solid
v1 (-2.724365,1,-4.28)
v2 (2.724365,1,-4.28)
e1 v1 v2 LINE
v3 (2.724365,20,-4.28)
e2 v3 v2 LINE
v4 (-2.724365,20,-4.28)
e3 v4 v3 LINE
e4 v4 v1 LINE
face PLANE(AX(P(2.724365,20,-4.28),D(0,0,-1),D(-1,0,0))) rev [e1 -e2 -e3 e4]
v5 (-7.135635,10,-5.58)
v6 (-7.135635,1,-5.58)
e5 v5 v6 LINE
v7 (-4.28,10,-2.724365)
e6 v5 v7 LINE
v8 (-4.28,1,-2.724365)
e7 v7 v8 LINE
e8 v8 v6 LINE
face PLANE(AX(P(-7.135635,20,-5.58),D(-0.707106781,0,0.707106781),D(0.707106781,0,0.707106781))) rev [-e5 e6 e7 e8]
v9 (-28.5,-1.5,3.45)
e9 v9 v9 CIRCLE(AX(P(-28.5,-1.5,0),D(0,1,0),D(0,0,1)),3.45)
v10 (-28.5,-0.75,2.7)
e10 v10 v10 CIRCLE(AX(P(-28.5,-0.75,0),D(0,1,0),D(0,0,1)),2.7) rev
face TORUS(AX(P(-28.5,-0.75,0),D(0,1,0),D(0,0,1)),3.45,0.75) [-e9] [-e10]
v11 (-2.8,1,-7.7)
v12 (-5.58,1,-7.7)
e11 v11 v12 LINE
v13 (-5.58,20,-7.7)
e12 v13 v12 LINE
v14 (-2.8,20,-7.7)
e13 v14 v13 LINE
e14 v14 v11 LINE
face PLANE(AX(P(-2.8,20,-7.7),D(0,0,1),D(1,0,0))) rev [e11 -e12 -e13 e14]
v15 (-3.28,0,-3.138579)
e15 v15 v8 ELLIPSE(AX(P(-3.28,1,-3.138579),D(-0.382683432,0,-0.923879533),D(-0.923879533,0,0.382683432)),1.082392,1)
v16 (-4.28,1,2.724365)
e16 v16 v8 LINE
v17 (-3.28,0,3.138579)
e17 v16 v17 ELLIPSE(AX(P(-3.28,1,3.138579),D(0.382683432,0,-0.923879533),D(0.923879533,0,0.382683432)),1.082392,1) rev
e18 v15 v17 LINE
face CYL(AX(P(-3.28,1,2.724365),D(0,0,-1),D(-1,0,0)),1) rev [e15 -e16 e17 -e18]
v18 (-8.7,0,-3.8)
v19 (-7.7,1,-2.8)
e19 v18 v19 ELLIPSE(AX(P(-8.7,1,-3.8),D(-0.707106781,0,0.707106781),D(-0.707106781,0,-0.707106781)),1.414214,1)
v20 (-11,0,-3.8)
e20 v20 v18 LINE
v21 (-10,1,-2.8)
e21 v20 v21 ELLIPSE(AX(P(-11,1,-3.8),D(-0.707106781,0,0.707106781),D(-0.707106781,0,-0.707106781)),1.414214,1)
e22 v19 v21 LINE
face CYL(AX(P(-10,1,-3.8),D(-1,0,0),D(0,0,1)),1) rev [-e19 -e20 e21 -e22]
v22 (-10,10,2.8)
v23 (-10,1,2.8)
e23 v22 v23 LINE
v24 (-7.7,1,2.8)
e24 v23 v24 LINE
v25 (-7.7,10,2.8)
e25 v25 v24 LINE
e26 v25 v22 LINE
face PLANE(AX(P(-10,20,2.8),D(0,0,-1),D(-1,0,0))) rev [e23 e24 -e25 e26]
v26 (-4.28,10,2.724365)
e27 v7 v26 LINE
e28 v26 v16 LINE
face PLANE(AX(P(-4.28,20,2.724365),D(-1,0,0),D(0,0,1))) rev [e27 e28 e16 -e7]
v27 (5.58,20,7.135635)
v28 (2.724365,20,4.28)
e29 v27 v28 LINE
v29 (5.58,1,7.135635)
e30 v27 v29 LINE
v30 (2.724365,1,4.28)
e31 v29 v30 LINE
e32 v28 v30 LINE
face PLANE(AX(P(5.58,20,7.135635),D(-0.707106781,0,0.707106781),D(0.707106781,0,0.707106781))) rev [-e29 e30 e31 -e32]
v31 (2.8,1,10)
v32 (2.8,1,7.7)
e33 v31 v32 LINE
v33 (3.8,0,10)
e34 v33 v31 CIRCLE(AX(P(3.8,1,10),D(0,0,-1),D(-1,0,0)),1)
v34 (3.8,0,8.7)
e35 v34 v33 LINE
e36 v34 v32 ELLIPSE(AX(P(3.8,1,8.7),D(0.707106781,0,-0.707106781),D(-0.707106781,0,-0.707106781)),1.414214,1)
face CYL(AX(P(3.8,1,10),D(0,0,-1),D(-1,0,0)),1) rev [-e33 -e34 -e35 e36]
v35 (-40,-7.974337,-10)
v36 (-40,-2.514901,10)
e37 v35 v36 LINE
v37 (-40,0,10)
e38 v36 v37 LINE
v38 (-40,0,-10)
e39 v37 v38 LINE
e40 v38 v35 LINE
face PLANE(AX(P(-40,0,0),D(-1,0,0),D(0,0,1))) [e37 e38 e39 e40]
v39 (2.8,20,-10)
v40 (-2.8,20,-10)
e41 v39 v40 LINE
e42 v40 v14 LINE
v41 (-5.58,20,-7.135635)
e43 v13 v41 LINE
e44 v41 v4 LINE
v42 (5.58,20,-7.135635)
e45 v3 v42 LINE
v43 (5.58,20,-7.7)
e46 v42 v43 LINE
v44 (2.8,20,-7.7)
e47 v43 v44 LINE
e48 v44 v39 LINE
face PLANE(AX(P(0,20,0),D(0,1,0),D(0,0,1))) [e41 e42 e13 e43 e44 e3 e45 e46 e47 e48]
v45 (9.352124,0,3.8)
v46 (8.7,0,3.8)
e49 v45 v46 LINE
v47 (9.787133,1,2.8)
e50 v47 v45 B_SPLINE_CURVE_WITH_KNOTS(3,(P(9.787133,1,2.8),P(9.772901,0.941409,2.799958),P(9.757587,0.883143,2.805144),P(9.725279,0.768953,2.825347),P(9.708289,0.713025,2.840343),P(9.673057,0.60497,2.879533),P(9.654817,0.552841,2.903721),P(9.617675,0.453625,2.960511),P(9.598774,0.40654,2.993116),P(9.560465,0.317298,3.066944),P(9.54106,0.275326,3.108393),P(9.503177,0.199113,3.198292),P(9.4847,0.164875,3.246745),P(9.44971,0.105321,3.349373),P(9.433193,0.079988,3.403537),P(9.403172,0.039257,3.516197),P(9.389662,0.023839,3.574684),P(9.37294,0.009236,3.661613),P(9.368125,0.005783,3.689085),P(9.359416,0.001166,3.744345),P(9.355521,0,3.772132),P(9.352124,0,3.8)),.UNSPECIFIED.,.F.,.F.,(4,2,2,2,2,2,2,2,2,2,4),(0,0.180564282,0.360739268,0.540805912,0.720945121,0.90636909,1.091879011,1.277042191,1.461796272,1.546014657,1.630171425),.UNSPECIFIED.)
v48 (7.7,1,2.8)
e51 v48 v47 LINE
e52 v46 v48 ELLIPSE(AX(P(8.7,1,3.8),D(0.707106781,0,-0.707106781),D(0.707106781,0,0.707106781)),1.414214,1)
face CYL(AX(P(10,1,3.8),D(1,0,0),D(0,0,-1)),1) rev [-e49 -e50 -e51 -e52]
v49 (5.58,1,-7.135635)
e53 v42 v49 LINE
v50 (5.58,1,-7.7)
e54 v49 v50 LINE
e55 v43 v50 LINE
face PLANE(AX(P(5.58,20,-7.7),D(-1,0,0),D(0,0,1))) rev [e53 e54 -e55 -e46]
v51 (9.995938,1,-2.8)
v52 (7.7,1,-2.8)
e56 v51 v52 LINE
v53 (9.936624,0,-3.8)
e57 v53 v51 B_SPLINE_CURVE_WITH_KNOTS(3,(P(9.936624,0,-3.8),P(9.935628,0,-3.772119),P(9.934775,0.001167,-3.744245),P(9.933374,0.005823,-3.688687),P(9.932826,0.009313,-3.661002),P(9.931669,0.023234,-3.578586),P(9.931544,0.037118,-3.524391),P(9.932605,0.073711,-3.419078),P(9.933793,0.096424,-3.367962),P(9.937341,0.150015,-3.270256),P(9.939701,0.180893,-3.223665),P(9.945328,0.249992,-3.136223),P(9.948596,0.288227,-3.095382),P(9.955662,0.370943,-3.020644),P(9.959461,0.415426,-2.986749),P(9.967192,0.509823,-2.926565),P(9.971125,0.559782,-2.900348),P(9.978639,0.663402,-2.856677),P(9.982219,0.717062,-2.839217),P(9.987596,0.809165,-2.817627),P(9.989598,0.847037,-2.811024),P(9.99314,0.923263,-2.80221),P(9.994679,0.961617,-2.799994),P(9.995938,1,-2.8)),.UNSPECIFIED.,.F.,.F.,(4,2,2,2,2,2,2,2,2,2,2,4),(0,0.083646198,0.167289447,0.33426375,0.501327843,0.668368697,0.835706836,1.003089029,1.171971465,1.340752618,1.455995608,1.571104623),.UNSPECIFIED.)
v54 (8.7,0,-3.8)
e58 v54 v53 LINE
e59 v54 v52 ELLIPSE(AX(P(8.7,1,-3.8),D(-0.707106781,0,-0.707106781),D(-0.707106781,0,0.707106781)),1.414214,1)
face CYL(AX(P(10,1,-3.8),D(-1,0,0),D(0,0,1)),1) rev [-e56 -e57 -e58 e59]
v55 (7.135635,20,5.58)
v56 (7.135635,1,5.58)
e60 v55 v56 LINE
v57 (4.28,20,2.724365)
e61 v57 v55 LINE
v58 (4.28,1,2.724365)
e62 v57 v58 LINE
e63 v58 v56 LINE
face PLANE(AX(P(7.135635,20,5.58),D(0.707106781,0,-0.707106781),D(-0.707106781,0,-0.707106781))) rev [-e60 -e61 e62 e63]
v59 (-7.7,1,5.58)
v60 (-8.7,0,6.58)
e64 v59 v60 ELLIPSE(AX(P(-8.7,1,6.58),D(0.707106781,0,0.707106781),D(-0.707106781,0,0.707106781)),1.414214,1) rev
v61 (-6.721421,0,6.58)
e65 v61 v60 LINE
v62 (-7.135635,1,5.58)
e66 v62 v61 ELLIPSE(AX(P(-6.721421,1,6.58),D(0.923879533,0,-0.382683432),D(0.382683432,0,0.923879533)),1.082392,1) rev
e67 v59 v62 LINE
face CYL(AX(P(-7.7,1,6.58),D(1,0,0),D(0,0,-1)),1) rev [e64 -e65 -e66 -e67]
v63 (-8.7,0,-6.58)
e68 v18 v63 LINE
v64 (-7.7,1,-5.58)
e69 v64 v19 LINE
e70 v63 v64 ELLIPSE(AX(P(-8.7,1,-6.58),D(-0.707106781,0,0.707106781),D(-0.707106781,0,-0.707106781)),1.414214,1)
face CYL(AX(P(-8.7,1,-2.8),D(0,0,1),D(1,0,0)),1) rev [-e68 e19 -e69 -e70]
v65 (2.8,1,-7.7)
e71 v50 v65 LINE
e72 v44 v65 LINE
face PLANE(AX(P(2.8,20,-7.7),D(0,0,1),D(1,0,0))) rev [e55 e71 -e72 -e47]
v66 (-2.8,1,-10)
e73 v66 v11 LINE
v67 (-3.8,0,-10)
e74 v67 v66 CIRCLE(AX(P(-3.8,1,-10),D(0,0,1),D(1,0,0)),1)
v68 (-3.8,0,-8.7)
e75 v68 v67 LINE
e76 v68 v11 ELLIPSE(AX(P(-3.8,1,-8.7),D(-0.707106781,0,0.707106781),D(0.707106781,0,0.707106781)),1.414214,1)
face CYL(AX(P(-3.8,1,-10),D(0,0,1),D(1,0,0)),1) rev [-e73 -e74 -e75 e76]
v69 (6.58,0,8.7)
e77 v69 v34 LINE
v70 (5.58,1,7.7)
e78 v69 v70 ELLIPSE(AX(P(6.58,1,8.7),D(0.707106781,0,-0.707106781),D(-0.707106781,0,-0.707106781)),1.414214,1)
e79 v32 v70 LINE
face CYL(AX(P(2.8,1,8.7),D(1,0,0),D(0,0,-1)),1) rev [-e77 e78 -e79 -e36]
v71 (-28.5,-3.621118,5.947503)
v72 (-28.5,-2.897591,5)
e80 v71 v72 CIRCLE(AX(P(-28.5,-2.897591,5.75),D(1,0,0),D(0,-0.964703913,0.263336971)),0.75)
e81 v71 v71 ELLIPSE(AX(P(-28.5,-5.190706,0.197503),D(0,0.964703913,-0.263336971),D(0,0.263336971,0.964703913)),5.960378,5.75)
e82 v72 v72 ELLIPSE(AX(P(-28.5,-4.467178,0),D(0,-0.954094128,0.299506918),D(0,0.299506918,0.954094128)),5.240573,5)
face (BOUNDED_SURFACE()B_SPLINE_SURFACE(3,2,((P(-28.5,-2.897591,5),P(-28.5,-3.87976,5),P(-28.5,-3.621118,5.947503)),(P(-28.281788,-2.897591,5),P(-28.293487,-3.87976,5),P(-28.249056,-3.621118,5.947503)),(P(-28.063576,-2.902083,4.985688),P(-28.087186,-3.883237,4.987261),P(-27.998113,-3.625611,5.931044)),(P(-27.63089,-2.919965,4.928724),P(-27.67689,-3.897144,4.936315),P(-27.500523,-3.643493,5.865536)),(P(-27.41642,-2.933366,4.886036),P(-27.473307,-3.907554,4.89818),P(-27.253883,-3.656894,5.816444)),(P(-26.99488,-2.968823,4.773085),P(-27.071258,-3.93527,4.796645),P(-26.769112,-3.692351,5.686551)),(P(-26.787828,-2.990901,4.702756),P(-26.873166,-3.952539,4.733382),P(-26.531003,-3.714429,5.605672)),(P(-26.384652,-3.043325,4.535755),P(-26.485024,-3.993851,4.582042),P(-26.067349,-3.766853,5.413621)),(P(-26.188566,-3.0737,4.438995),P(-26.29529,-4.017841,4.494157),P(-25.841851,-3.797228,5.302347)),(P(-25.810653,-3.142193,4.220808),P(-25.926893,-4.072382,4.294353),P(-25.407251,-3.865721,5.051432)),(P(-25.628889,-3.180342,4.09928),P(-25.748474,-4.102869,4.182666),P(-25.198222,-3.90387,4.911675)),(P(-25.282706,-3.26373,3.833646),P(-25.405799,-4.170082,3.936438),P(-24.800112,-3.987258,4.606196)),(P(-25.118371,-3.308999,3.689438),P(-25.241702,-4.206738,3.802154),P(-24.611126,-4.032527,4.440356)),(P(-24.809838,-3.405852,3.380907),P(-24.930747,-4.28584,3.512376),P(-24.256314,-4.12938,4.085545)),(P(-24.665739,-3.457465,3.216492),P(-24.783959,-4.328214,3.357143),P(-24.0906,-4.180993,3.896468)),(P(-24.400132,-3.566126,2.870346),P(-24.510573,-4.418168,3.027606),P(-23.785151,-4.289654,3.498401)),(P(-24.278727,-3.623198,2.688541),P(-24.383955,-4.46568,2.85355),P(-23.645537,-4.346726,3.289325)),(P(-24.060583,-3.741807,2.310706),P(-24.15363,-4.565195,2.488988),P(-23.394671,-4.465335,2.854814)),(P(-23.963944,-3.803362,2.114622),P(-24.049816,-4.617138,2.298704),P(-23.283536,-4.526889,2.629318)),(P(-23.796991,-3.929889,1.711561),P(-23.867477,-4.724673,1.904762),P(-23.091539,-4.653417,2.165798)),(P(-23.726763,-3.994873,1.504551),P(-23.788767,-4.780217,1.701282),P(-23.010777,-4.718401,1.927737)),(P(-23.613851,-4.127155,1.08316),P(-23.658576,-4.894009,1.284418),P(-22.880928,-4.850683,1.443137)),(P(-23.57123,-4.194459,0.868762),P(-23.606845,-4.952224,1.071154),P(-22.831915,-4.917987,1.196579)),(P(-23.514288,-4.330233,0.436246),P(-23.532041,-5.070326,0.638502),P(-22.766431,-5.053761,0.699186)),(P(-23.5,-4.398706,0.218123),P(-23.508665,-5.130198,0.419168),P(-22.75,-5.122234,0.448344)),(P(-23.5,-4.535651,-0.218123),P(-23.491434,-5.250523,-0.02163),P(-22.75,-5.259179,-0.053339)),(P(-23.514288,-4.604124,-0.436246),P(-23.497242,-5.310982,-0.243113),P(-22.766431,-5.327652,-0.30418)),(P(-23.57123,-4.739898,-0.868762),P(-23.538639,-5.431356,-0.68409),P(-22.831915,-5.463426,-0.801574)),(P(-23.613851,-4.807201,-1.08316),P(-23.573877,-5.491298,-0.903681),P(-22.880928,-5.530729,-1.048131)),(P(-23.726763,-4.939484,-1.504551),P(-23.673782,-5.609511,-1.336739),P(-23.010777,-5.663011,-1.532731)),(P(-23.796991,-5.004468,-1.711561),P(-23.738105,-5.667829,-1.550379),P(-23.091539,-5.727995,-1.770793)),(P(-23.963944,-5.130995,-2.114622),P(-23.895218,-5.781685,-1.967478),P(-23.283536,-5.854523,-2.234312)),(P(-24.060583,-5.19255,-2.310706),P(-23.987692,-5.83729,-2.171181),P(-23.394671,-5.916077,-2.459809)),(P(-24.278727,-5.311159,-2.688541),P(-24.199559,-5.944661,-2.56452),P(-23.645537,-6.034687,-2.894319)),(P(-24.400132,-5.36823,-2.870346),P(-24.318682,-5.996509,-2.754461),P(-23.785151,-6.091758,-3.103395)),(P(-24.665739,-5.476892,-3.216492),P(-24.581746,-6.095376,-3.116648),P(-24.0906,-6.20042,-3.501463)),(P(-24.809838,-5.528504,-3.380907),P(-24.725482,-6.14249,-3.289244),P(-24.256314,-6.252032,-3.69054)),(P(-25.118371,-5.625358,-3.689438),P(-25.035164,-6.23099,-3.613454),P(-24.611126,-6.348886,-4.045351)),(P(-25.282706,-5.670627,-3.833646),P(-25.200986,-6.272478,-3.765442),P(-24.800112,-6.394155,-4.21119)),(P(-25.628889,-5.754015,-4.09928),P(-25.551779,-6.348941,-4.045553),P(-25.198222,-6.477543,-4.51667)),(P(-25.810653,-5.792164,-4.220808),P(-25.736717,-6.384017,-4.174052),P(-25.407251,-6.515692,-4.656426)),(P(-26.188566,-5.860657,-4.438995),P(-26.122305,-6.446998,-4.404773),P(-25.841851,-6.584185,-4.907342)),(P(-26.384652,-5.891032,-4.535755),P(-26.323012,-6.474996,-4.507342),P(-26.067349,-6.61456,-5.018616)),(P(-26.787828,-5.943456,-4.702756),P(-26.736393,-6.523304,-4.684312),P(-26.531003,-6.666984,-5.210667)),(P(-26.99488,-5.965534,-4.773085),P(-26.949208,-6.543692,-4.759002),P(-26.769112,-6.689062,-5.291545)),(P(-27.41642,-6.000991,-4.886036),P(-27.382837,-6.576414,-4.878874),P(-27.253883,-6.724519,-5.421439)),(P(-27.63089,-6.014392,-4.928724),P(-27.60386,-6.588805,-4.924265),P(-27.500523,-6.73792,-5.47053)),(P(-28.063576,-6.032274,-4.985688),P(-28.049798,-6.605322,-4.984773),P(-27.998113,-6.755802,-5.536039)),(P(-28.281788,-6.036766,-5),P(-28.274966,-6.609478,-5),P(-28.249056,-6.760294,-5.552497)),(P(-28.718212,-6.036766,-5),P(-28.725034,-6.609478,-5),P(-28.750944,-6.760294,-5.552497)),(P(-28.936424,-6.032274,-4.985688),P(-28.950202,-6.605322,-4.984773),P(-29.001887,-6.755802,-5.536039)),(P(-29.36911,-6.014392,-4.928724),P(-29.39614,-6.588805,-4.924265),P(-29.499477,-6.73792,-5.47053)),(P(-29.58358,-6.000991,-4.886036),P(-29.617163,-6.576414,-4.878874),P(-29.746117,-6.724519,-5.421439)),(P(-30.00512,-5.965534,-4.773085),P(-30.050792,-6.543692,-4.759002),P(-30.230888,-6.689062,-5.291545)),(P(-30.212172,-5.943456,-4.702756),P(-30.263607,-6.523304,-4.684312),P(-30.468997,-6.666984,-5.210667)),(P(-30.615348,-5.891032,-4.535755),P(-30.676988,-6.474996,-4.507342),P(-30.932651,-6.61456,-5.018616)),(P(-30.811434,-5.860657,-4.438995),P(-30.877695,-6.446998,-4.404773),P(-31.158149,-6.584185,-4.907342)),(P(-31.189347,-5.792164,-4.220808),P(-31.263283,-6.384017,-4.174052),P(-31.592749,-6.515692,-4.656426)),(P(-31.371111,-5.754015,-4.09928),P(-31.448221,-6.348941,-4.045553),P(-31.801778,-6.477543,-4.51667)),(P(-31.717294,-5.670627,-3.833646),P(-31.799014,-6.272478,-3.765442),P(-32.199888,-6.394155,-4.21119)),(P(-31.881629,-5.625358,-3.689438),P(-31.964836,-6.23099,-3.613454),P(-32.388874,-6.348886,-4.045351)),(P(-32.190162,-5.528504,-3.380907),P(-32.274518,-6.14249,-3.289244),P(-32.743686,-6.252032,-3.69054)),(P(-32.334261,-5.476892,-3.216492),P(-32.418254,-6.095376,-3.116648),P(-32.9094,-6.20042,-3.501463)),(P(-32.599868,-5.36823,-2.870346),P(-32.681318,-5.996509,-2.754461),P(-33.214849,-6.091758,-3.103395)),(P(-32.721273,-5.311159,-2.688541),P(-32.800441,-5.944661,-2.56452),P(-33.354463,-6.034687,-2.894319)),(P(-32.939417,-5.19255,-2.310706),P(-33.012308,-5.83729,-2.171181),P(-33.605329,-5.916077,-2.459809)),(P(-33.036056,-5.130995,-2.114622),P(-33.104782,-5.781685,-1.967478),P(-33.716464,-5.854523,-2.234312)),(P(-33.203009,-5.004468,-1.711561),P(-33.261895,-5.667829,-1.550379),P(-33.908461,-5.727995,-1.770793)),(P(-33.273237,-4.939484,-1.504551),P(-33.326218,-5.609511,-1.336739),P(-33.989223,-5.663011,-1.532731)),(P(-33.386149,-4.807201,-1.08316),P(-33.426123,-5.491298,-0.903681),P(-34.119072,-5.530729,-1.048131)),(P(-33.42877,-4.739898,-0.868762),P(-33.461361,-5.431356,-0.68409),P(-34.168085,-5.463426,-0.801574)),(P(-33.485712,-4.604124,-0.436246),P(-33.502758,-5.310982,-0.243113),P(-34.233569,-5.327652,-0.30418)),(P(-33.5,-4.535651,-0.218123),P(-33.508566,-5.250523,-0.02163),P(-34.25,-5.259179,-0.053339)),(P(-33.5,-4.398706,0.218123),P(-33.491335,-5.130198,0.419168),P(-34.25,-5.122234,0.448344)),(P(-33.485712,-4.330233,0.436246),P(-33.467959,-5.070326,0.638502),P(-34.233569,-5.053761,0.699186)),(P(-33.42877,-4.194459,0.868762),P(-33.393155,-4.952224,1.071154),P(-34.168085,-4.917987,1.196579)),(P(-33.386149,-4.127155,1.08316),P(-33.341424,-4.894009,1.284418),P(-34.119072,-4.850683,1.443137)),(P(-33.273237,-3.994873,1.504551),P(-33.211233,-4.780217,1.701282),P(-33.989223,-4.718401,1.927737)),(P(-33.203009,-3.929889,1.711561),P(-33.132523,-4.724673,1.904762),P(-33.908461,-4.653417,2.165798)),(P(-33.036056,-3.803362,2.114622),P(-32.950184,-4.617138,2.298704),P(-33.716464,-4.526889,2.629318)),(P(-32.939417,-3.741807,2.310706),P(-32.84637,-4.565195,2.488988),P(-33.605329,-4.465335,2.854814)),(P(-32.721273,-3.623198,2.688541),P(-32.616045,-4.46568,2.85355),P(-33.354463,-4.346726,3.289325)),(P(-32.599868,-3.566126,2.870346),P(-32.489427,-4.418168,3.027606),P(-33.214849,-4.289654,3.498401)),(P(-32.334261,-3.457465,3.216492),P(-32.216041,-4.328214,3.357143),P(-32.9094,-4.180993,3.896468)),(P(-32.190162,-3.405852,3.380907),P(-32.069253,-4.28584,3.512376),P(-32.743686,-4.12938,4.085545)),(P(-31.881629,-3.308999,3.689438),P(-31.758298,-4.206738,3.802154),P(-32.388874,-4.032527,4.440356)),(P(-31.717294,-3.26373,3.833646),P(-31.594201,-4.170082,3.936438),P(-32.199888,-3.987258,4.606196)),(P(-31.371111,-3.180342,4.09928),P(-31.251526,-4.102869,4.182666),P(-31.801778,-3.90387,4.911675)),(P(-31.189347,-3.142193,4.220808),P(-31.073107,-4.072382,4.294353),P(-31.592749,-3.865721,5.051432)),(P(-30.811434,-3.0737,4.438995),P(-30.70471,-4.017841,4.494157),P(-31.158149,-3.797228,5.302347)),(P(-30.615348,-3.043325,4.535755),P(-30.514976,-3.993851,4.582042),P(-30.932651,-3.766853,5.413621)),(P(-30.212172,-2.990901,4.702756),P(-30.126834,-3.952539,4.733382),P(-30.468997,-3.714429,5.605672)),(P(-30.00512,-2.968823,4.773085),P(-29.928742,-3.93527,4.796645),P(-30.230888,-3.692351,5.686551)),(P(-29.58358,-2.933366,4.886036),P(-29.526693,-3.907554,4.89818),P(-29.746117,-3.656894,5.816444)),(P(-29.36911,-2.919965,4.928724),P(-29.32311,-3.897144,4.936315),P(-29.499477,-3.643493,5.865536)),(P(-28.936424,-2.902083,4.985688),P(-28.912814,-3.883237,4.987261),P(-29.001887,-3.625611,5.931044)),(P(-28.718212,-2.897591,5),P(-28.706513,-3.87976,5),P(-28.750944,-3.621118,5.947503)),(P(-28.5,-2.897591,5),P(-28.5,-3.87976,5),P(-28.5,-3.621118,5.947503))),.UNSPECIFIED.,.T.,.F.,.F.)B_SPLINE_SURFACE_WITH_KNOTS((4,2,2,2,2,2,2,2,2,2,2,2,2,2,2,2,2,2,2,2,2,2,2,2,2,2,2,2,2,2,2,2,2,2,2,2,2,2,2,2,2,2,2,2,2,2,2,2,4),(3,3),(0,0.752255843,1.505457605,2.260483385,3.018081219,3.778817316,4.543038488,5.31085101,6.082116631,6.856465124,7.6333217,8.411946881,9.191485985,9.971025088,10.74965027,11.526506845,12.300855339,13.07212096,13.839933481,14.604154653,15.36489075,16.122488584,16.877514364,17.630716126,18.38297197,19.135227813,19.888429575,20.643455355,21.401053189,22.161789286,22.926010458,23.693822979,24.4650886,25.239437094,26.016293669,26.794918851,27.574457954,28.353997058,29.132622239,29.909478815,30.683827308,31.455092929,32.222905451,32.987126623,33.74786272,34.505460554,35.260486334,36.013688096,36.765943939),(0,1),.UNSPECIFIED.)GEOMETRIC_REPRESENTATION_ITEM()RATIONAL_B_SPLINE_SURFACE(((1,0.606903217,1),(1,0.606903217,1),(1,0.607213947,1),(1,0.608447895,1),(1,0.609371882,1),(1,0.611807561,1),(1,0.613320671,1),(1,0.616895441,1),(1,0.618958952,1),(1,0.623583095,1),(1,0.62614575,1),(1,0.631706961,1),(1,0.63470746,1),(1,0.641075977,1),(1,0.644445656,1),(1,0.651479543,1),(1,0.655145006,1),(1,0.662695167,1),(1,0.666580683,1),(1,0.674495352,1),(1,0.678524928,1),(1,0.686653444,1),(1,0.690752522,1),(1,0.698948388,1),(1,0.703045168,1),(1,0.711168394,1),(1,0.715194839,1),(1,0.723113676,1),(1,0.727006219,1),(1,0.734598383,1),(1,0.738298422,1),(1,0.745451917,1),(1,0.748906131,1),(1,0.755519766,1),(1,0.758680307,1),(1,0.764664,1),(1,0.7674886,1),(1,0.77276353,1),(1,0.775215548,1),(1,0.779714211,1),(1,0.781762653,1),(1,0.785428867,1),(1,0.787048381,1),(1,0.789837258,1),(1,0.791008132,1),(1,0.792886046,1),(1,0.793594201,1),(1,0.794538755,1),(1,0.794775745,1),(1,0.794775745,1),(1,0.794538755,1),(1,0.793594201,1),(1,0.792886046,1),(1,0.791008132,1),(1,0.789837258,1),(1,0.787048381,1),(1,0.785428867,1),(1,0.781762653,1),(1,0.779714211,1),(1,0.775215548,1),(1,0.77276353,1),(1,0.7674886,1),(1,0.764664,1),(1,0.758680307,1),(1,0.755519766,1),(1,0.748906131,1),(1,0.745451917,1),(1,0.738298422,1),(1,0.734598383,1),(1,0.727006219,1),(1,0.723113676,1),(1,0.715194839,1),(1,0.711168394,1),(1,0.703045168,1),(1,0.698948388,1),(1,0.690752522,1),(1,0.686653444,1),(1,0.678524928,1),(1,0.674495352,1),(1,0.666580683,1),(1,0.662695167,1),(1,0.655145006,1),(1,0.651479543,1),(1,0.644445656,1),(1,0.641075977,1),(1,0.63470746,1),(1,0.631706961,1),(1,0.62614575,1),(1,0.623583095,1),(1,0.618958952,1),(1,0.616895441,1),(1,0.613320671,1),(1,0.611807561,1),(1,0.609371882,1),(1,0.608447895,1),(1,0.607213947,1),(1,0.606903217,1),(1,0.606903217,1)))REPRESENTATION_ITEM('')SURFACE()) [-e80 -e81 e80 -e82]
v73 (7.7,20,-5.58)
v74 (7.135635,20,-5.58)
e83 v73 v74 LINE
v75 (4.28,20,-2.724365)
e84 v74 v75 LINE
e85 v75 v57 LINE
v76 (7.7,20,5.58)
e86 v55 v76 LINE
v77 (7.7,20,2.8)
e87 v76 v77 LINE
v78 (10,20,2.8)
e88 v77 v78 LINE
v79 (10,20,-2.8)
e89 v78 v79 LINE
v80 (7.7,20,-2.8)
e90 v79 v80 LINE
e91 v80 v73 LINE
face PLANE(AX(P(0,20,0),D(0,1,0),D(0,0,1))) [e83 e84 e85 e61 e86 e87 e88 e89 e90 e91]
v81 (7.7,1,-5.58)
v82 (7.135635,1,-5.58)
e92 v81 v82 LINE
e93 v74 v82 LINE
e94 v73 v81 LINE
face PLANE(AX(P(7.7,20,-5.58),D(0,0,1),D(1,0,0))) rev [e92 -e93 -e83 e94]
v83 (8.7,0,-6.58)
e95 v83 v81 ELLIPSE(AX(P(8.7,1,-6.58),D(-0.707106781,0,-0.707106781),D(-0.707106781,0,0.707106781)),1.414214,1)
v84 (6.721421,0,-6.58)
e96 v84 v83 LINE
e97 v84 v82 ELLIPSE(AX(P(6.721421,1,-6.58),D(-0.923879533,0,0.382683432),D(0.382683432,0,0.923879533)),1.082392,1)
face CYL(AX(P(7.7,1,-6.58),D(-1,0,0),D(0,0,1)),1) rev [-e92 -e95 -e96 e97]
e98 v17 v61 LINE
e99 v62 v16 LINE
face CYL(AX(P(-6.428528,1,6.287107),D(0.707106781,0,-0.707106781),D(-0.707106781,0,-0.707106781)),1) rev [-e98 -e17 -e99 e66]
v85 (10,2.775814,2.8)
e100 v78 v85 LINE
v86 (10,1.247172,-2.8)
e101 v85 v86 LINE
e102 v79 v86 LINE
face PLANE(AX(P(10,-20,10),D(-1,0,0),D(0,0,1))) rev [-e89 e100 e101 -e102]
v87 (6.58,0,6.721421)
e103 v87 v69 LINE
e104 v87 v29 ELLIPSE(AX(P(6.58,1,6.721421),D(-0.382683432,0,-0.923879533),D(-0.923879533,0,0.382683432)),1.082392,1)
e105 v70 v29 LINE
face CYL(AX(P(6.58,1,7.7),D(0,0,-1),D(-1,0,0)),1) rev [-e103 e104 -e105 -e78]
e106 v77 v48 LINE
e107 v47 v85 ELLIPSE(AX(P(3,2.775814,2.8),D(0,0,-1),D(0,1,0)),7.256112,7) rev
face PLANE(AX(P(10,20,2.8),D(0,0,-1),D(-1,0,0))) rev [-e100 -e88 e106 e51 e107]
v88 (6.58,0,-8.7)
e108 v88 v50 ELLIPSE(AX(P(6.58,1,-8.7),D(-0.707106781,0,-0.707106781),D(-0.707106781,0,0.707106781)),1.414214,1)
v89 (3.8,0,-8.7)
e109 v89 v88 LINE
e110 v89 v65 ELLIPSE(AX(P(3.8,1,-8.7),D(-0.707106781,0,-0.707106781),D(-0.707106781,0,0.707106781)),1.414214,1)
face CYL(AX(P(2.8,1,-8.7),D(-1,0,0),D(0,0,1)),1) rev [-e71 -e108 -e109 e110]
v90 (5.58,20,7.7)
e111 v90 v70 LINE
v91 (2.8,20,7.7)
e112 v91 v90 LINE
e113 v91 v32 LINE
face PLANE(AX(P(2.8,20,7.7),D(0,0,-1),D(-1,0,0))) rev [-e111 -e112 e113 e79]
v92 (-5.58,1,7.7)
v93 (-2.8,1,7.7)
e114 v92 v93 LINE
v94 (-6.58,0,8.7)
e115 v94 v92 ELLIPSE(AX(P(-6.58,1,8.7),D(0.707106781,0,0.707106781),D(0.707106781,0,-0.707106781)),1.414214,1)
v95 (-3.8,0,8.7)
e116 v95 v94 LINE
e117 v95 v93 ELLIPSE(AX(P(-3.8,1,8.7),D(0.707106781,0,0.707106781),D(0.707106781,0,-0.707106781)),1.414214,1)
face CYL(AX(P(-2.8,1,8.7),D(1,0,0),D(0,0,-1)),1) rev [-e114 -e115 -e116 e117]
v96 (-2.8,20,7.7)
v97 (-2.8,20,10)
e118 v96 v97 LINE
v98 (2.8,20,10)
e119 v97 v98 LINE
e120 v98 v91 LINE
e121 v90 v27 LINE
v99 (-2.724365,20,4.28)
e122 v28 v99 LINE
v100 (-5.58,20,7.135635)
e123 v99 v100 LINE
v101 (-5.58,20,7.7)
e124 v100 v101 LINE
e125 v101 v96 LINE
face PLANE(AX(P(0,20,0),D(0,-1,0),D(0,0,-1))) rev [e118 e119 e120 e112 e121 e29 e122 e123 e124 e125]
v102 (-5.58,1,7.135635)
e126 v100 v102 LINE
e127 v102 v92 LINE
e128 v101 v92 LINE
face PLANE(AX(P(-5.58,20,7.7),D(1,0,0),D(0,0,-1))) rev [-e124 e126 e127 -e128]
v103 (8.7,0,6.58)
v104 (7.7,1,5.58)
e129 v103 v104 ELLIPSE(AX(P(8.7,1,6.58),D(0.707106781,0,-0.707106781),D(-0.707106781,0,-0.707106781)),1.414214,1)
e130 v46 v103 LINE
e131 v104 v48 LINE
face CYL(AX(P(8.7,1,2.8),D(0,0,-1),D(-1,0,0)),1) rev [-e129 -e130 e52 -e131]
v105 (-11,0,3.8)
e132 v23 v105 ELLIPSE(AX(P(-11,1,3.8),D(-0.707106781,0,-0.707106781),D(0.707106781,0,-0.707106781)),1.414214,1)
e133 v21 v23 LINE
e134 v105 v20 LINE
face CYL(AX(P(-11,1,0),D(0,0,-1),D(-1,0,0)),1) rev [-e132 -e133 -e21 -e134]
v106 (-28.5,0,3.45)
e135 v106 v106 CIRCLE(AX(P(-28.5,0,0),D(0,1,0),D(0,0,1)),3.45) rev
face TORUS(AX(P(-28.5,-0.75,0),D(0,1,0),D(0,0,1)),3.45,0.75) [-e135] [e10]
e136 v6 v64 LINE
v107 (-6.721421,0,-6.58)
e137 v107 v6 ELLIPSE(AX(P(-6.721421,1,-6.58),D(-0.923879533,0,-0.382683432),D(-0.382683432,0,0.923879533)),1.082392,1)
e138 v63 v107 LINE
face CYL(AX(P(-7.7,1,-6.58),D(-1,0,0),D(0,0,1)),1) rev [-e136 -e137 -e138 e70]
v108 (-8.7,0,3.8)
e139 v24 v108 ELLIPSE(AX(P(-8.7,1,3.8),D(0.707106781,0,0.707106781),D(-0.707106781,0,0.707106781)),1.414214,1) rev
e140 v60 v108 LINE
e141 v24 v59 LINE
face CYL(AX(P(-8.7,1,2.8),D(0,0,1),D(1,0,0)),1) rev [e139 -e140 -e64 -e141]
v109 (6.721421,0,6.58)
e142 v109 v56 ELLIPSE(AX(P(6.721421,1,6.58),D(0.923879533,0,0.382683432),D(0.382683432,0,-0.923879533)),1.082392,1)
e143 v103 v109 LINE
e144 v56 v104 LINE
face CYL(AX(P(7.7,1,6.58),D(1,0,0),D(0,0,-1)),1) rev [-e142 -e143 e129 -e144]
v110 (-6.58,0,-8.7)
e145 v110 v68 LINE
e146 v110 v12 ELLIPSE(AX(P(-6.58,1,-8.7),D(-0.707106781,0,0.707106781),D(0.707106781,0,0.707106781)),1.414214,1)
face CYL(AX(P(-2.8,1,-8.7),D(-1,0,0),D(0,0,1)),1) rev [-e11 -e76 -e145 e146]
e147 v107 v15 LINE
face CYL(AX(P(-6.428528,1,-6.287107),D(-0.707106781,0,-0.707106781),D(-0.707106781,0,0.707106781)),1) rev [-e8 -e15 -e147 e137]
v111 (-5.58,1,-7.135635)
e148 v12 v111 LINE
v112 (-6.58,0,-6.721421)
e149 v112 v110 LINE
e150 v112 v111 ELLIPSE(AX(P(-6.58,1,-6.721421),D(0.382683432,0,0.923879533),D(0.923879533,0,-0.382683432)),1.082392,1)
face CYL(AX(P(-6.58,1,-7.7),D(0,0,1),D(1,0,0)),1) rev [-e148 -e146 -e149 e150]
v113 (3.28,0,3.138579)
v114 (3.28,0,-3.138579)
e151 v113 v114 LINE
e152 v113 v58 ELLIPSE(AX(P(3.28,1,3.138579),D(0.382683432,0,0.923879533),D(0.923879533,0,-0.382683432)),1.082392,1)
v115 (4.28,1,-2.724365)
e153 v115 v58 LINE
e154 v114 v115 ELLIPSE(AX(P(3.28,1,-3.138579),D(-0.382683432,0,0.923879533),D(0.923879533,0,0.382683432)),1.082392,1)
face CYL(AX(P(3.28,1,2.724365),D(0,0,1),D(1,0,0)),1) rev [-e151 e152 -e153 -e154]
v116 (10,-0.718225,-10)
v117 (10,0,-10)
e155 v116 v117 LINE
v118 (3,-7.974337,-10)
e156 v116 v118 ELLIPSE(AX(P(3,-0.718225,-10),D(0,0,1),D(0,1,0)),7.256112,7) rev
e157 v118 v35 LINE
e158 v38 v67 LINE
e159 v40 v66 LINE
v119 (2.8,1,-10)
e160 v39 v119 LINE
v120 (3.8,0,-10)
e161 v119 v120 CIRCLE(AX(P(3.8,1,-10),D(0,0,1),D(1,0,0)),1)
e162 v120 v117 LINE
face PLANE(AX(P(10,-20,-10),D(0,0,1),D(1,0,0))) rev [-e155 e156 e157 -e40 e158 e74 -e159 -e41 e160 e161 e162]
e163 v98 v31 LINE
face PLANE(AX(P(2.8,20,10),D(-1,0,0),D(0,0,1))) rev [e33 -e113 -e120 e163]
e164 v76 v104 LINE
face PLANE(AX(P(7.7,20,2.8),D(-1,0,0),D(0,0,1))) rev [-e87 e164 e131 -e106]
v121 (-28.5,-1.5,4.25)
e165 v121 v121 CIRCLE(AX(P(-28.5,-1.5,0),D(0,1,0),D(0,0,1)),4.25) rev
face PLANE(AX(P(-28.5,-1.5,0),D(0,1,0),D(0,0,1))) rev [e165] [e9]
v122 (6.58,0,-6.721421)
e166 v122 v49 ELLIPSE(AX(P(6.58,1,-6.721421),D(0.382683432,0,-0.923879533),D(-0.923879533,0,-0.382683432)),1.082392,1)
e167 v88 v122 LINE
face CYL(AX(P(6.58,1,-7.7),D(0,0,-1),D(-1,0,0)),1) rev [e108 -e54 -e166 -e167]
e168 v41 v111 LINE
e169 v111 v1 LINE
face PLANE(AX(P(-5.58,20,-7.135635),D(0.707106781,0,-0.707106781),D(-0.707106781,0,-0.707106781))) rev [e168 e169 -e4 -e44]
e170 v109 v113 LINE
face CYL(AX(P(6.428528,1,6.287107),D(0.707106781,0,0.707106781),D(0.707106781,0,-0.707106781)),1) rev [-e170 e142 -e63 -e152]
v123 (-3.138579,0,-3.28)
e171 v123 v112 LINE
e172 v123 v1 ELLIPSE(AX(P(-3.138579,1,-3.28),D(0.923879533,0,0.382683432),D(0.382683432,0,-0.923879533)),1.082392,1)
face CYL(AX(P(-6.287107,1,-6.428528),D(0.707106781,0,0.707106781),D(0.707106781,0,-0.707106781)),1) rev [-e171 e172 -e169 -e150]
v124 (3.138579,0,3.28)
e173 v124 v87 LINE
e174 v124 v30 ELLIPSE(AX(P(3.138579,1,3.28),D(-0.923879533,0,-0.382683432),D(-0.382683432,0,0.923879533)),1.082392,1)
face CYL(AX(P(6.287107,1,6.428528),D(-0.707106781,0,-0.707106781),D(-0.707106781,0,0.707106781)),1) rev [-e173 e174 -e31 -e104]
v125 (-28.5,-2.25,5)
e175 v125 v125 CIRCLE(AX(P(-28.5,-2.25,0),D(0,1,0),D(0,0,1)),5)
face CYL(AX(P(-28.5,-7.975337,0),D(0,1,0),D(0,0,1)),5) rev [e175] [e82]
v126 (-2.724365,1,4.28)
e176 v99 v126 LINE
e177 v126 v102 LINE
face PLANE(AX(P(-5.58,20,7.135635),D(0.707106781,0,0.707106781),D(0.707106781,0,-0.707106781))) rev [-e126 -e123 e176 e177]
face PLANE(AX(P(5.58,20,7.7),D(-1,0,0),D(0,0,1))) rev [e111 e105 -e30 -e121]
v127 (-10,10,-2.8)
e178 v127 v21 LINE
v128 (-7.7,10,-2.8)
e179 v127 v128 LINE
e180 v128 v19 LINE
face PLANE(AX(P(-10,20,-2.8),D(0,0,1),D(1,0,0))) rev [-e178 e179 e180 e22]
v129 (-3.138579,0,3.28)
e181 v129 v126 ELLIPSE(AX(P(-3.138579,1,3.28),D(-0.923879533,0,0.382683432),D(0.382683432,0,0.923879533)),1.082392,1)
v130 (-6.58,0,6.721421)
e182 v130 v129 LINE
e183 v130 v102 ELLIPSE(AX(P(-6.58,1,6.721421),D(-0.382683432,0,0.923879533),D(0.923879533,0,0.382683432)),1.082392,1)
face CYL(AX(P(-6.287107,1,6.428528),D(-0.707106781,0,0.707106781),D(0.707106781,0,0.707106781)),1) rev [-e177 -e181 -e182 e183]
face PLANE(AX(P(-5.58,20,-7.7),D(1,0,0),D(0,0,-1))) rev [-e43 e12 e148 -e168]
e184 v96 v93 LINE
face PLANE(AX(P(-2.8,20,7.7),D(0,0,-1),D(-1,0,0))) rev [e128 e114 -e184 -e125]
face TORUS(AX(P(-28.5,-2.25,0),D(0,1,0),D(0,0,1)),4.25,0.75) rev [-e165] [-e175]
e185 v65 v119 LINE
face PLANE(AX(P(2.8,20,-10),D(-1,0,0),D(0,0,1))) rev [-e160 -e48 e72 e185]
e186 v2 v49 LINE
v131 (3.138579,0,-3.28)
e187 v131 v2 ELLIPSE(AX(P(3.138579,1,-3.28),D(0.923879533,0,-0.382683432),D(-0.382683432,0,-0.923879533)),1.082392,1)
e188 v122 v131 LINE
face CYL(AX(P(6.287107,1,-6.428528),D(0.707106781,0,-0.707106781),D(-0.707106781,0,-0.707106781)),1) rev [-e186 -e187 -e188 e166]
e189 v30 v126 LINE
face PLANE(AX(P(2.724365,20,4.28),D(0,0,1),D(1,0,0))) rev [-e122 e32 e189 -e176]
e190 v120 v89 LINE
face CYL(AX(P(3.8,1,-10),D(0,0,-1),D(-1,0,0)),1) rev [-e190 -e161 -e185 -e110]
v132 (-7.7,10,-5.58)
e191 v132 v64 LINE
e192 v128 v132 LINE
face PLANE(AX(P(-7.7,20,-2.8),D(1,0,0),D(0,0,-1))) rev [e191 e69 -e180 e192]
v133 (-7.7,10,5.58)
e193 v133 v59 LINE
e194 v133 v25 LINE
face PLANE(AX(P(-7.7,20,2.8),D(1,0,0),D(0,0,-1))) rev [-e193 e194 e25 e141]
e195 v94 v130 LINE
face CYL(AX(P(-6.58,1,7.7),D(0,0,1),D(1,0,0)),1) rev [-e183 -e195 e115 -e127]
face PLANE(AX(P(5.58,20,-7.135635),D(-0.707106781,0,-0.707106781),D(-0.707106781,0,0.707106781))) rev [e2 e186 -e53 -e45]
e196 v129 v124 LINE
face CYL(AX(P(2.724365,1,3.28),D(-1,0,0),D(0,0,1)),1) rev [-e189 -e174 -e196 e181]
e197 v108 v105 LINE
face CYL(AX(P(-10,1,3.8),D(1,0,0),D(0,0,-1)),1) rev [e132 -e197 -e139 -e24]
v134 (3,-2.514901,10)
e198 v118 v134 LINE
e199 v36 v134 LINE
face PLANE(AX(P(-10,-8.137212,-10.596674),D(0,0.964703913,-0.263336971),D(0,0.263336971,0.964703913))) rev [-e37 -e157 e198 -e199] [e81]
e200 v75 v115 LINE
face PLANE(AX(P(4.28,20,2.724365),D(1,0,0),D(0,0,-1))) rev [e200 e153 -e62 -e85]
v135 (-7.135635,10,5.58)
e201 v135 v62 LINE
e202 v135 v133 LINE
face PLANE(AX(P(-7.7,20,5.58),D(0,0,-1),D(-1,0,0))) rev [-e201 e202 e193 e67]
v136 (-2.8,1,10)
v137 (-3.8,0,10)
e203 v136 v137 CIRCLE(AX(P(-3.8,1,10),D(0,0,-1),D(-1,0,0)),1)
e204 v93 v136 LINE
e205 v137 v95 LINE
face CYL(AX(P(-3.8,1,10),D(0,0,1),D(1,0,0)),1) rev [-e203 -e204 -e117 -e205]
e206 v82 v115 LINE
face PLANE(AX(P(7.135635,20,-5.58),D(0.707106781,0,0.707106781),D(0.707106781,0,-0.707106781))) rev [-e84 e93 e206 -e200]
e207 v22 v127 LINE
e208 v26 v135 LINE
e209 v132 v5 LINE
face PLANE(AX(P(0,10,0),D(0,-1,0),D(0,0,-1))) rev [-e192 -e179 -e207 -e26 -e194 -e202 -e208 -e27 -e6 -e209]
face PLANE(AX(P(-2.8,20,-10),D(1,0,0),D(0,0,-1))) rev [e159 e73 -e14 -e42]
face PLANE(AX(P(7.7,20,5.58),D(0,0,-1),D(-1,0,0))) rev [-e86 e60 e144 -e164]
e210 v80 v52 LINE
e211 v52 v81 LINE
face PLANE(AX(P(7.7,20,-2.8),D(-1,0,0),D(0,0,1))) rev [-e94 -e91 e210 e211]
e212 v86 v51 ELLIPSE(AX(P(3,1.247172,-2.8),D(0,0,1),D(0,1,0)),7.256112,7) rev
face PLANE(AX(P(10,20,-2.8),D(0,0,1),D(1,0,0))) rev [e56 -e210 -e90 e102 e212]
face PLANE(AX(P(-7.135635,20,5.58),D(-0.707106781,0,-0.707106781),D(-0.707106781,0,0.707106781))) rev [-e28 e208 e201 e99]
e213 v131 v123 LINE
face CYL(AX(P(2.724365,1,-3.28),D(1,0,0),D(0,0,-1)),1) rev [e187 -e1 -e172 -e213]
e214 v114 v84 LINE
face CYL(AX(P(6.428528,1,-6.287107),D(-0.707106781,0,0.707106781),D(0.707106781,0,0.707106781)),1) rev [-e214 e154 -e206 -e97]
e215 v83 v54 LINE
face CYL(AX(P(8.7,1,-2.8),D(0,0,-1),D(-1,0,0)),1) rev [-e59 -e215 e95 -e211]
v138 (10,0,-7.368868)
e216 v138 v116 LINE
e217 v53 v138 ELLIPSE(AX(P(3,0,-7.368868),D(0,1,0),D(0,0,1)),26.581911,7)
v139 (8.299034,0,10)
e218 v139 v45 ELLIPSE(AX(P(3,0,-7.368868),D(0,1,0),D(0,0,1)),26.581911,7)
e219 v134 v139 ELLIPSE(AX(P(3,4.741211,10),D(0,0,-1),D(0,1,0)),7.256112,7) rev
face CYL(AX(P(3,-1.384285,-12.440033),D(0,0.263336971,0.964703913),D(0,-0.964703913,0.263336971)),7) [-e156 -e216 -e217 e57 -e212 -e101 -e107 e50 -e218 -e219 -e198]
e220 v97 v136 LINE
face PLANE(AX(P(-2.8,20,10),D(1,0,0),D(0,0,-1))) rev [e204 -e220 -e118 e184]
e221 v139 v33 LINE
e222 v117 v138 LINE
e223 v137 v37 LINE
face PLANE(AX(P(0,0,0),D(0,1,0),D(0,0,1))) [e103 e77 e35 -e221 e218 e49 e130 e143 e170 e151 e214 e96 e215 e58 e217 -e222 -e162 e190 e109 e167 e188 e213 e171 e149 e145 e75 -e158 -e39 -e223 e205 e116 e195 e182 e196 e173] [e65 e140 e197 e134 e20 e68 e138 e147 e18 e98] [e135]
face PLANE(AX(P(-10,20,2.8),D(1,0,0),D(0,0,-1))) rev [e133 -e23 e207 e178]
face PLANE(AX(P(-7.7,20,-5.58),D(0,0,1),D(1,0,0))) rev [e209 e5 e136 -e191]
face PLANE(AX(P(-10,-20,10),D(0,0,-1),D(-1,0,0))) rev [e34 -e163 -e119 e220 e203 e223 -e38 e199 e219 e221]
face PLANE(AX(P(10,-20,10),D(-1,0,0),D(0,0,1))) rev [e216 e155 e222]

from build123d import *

# Parameters (mm, degrees)
BOSS_EXTRUDE1_DEPTH   = 20
BOSS_EXTRUDE1_2_DEPTH = 20
BOSS_EXTRUDE1_3_DEPTH = 20
BOSS_EXTRUDE1_4_DEPTH = 20
SKETCH2_W             = 20
SKETCH2_H             = 20
BOSS_EXTRUDE2_DEPTH   = 20
CUT_EXTRUDE1_DEPTH    = 31
BOSS_EXTRUDE3_DEPTH   = 30
FILLET1_R             = 7
CUT_EXTRUDE2_REACH    = 47.826
SKETCH5_R             = 2.7
CUT_EXTRUDE3_REACH    = 48.5
SKETCH6_R             = 5
FILLET5_R             = 1
FILLET6_R             = 0.75
CUT_EXTRUDE4_DEPTH    = 10


# Some blends are built 0.0001 mm under size
with BuildPart() as part:
    # Sketch1 → Boss-Extrude1 (new body)
    with BuildSketch(Plane(origin=(0, 0, 0), x_dir=(1, 0, 0), z_dir=(0, 1, 0))):
        Polygon((-10, -2.8), (-10, 2.8), (-7.7, 2.8), (-7.7, 5.58), (-7.135634919, 5.58), (-4.28, 2.724365081), (-4.28, -2.724365081), (-7.135634919, -5.58), (-7.7, -5.58), (-7.7, -2.8), align=None)
    extrude(amount=BOSS_EXTRUDE1_DEPTH)



with BuildPart() as body_2:
    # Sketch1 → Boss-Extrude1 2 (new body)
    with BuildSketch(Plane(origin=(0, 0, 0), x_dir=(1, 0, 0), z_dir=(0, 1, 0))):
        Polygon((10, 2.8), (7.7, 2.8), (7.7, 5.58), (7.135634919, 5.58), (4.28, 2.724365081), (4.28, -2.724365081), (7.135634919, -5.58), (7.7, -5.58), (7.7, -2.8), (10, -2.8), align=None)
    extrude(amount=BOSS_EXTRUDE1_2_DEPTH)


with BuildPart() as body_3:
    # Sketch1 → Boss-Extrude1 3 (new body)
    with BuildSketch(Plane(origin=(0, 0, 0), x_dir=(1, 0, 0), z_dir=(0, 1, 0))):
        Polygon((2.8, -10), (-2.8, -10), (-2.8, -7.7), (-5.58, -7.7), (-5.58, -7.135634919), (-2.724365081, -4.28), (2.724365081, -4.28), (5.58, -7.135634919), (5.58, -7.7), (2.8, -7.7), align=None)
    extrude(amount=BOSS_EXTRUDE1_3_DEPTH)


with BuildPart() as body_4:
    # Sketch1 → Boss-Extrude1 4 (new body)
    with BuildSketch(Plane(origin=(0, 0, 0), x_dir=(1, 0, 0), z_dir=(0, 1, 0))):
        Polygon((-2.8, 10), (-2.8, 7.7), (-5.58, 7.7), (-5.58, 7.135634919), (-2.724365081, 4.28), (2.724365081, 4.28), (5.58, 7.135634919), (5.58, 7.7), (2.8, 7.7), (2.8, 10), align=None)
    extrude(amount=BOSS_EXTRUDE1_4_DEPTH)


with BuildPart() as part_1:
    add(part.part)

    add(body_2.part)  # Boss-Extrude2 merges body 2

    add(body_3.part)  # Boss-Extrude2 merges body 3

    add(body_4.part)  # Boss-Extrude2 merges body 4
    # Sketch2 → Boss-Extrude2 (add)
    with BuildSketch(Plane.XZ):
        Rectangle(SKETCH2_W, SKETCH2_H)
    extrude(amount=BOSS_EXTRUDE2_DEPTH)

    # Sketch3 → Cut-Extrude1 (cut, through all)
    with BuildSketch(Plane(origin=(10, 0, 0), x_dir=(0, 0, -1), z_dir=(1, 0, 0))):
        Polygon((10.596673941, -8.137212268), (10.596673941, -38.345549702), (-10.411138478, -38.345549702), (-10.411138478, -2.402671747), align=None)
    extrude(amount=-CUT_EXTRUDE1_DEPTH, mode=Mode.SUBTRACT)

    # Sketch4 → Boss-Extrude3 (add)
    with BuildSketch(Plane.ZY.offset(10)):
        Polygon((10, 0), (-10, 0), (-10, -7.974337104), (10, -2.51490096), align=None)
    extrude(amount=BOSS_EXTRUDE3_DEPTH)

    # Fillet1
    # the kernel refuses this fillet: 7 mm, written as the material it takes off along each edge
    with BuildSketch(Plane(origin=(10, 2.093496024, 26.882318479), x_dir=(0, 0.9647039130954435, -0.26333697054978655), z_dir=(0, -0.26333697054978655, -0.9647039130954435))) as fillet1_piece_1:
        with BuildLine():
            CenterArc((FILLET1_R, -FILLET1_R), FILLET1_R, 90, 90)
            Line((0, -FILLET1_R), (0, 0))
            Line((0, 0), (FILLET1_R, 0))
        make_face()
    extrude(amount=55.731749637, mode=Mode.SUBTRACT)

    # Cut-Extrude2: up to this plane
    cut_extrude2_end = Plane(origin=(-10, -8.137212268, -10.596673941), z_dir=(0, 0.9647039130954435, -0.26333697054978655))
    # Sketch5 → Cut-Extrude2 (cut, up to the surface)
    with BuildSketch(Plane(origin=(0, 0, 0), x_dir=(1, 0, 0), z_dir=(0, 1, 0)), mode=Mode.PRIVATE) as cut_extrude2_sk1:
        with Locations(Location((-28.5, 0, 0), (0, 0, 270))):
            Circle(SKETCH5_R)
    cut_extrude2_tool1 = split(extrude(cut_extrude2_sk1.sketch, amount=-CUT_EXTRUDE2_REACH, mode=Mode.PRIVATE), bisect_by=cut_extrude2_end, keep=Keep.BOTH, mode=Mode.PRIVATE)
    add(cut_extrude2_tool1.solids().sort_by_distance((-28.5, 0, 0))[0], mode=Mode.SUBTRACT)

    # Cut-Extrude3: up to this plane
    cut_extrude3_end = Plane(origin=(-10, -8.137212268, -10.596673941), z_dir=(0, 0.9647039130954435, -0.26333697054978655))
    # Sketch6 → Cut-Extrude3 (cut, up to the surface)
    with BuildSketch(Plane(origin=(0, -1.5, 0), x_dir=(1, 0, 0), z_dir=(0, 1, 0)), mode=Mode.PRIVATE) as cut_extrude3_sk1:
        with Locations(Location((-28.5, 0, 0), (0, 0, 270))):
            Circle(SKETCH6_R)
    cut_extrude3_tool1 = split(extrude(cut_extrude3_sk1.sketch, amount=-CUT_EXTRUDE3_REACH, mode=Mode.PRIVATE), bisect_by=cut_extrude3_end, keep=Keep.BOTH, mode=Mode.PRIVATE)
    add(cut_extrude3_tool1.solids().sort_by_distance((-28.5, -1.5, 0))[0], mode=Mode.SUBTRACT)

    # Fillet5
    fillet5_edges = [part_1.edges().sort_by_distance(p)[0] for p in [
        (-4.28, 0, 0),
        (-5.707817459, 0, 4.152182541),
        (-7.417817459, 0, 5.58),
        (-7.7, 0, 4.19),
        (-8.85, 0, 2.8),
        (-10, 0, 0),
        (-8.85, 0, -2.8),
        (-7.7, 0, -4.19),
        (-5.707817459, 0, -4.152182541),
        (-7.417817459, 0, -5.58),
        (-2.8, 0, -8.85),
        (-4.19, 0, -7.7),
        (-5.58, 0, -7.417817459),
        (-4.152182541, 0, -5.707817459),
        (0, 0, -4.28),
        (4.152182541, 0, -5.707817459),
        (5.58, 0, -7.417817459),
        (4.19, 0, -7.7),
        (2.8, 0, -8.85),
        (8.79791333, 0, -2.8),
        (7.7, 0, -4.19),
        (7.417817459, 0, -5.58),
        (5.707817459, 0, -4.152182541),
        (4.28, 0, 0),
        (5.707817459, 0, 4.152182541),
        (7.417817459, 0, 5.58),
        (8.583774042, 0, 2.8),
        (7.7, 0, 4.19),
        (2.8, 0, 8.85),
        (4.19, 0, 7.7),
        (5.58, 0, 7.417817459),
        (4.152182541, 0, 5.707817459),
        (0, 0, 4.28),
        (-4.152182541, 0, 5.707817459),
        (-5.58, 0, 7.417817459),
        (-4.19, 0, 7.7),
        (-2.8, 0, 8.85),
    ]]
    fillet(fillet5_edges, radius=FILLET5_R)

    # Fillet6
    fillet6_edges = [part_1.edges().sort_by_distance(p)[0] for p in [
        (-28.5, 0, -2.7),
        (-28.5, -6.609478068, -5),
        (-28.5, -1.5, -2.7),
        (-28.5, -1.5, -5),
    ]]
    fillet(fillet6_edges, radius=FILLET6_R - 0.0001)  # a hair under: the kernel refuses the full size

    # Sketch7 → Cut-Extrude4 (cut)
    with BuildSketch(Plane(origin=(0, 20, 0), x_dir=(1, 0, 0), z_dir=(0, 1, 0))):
        Polygon((-7.555562818, 7.211994187), (-2.766940799, 2.423372169), (-2.766940799, -2.697134544), (-7.555562818, -7.485756562), (-13.102778423, -7.485756562), (-13.102778423, 7.211994187), align=None)
    extrude(amount=-CUT_EXTRUDE4_DEPTH, mode=Mode.SUBTRACT)


solid = part_1.part
